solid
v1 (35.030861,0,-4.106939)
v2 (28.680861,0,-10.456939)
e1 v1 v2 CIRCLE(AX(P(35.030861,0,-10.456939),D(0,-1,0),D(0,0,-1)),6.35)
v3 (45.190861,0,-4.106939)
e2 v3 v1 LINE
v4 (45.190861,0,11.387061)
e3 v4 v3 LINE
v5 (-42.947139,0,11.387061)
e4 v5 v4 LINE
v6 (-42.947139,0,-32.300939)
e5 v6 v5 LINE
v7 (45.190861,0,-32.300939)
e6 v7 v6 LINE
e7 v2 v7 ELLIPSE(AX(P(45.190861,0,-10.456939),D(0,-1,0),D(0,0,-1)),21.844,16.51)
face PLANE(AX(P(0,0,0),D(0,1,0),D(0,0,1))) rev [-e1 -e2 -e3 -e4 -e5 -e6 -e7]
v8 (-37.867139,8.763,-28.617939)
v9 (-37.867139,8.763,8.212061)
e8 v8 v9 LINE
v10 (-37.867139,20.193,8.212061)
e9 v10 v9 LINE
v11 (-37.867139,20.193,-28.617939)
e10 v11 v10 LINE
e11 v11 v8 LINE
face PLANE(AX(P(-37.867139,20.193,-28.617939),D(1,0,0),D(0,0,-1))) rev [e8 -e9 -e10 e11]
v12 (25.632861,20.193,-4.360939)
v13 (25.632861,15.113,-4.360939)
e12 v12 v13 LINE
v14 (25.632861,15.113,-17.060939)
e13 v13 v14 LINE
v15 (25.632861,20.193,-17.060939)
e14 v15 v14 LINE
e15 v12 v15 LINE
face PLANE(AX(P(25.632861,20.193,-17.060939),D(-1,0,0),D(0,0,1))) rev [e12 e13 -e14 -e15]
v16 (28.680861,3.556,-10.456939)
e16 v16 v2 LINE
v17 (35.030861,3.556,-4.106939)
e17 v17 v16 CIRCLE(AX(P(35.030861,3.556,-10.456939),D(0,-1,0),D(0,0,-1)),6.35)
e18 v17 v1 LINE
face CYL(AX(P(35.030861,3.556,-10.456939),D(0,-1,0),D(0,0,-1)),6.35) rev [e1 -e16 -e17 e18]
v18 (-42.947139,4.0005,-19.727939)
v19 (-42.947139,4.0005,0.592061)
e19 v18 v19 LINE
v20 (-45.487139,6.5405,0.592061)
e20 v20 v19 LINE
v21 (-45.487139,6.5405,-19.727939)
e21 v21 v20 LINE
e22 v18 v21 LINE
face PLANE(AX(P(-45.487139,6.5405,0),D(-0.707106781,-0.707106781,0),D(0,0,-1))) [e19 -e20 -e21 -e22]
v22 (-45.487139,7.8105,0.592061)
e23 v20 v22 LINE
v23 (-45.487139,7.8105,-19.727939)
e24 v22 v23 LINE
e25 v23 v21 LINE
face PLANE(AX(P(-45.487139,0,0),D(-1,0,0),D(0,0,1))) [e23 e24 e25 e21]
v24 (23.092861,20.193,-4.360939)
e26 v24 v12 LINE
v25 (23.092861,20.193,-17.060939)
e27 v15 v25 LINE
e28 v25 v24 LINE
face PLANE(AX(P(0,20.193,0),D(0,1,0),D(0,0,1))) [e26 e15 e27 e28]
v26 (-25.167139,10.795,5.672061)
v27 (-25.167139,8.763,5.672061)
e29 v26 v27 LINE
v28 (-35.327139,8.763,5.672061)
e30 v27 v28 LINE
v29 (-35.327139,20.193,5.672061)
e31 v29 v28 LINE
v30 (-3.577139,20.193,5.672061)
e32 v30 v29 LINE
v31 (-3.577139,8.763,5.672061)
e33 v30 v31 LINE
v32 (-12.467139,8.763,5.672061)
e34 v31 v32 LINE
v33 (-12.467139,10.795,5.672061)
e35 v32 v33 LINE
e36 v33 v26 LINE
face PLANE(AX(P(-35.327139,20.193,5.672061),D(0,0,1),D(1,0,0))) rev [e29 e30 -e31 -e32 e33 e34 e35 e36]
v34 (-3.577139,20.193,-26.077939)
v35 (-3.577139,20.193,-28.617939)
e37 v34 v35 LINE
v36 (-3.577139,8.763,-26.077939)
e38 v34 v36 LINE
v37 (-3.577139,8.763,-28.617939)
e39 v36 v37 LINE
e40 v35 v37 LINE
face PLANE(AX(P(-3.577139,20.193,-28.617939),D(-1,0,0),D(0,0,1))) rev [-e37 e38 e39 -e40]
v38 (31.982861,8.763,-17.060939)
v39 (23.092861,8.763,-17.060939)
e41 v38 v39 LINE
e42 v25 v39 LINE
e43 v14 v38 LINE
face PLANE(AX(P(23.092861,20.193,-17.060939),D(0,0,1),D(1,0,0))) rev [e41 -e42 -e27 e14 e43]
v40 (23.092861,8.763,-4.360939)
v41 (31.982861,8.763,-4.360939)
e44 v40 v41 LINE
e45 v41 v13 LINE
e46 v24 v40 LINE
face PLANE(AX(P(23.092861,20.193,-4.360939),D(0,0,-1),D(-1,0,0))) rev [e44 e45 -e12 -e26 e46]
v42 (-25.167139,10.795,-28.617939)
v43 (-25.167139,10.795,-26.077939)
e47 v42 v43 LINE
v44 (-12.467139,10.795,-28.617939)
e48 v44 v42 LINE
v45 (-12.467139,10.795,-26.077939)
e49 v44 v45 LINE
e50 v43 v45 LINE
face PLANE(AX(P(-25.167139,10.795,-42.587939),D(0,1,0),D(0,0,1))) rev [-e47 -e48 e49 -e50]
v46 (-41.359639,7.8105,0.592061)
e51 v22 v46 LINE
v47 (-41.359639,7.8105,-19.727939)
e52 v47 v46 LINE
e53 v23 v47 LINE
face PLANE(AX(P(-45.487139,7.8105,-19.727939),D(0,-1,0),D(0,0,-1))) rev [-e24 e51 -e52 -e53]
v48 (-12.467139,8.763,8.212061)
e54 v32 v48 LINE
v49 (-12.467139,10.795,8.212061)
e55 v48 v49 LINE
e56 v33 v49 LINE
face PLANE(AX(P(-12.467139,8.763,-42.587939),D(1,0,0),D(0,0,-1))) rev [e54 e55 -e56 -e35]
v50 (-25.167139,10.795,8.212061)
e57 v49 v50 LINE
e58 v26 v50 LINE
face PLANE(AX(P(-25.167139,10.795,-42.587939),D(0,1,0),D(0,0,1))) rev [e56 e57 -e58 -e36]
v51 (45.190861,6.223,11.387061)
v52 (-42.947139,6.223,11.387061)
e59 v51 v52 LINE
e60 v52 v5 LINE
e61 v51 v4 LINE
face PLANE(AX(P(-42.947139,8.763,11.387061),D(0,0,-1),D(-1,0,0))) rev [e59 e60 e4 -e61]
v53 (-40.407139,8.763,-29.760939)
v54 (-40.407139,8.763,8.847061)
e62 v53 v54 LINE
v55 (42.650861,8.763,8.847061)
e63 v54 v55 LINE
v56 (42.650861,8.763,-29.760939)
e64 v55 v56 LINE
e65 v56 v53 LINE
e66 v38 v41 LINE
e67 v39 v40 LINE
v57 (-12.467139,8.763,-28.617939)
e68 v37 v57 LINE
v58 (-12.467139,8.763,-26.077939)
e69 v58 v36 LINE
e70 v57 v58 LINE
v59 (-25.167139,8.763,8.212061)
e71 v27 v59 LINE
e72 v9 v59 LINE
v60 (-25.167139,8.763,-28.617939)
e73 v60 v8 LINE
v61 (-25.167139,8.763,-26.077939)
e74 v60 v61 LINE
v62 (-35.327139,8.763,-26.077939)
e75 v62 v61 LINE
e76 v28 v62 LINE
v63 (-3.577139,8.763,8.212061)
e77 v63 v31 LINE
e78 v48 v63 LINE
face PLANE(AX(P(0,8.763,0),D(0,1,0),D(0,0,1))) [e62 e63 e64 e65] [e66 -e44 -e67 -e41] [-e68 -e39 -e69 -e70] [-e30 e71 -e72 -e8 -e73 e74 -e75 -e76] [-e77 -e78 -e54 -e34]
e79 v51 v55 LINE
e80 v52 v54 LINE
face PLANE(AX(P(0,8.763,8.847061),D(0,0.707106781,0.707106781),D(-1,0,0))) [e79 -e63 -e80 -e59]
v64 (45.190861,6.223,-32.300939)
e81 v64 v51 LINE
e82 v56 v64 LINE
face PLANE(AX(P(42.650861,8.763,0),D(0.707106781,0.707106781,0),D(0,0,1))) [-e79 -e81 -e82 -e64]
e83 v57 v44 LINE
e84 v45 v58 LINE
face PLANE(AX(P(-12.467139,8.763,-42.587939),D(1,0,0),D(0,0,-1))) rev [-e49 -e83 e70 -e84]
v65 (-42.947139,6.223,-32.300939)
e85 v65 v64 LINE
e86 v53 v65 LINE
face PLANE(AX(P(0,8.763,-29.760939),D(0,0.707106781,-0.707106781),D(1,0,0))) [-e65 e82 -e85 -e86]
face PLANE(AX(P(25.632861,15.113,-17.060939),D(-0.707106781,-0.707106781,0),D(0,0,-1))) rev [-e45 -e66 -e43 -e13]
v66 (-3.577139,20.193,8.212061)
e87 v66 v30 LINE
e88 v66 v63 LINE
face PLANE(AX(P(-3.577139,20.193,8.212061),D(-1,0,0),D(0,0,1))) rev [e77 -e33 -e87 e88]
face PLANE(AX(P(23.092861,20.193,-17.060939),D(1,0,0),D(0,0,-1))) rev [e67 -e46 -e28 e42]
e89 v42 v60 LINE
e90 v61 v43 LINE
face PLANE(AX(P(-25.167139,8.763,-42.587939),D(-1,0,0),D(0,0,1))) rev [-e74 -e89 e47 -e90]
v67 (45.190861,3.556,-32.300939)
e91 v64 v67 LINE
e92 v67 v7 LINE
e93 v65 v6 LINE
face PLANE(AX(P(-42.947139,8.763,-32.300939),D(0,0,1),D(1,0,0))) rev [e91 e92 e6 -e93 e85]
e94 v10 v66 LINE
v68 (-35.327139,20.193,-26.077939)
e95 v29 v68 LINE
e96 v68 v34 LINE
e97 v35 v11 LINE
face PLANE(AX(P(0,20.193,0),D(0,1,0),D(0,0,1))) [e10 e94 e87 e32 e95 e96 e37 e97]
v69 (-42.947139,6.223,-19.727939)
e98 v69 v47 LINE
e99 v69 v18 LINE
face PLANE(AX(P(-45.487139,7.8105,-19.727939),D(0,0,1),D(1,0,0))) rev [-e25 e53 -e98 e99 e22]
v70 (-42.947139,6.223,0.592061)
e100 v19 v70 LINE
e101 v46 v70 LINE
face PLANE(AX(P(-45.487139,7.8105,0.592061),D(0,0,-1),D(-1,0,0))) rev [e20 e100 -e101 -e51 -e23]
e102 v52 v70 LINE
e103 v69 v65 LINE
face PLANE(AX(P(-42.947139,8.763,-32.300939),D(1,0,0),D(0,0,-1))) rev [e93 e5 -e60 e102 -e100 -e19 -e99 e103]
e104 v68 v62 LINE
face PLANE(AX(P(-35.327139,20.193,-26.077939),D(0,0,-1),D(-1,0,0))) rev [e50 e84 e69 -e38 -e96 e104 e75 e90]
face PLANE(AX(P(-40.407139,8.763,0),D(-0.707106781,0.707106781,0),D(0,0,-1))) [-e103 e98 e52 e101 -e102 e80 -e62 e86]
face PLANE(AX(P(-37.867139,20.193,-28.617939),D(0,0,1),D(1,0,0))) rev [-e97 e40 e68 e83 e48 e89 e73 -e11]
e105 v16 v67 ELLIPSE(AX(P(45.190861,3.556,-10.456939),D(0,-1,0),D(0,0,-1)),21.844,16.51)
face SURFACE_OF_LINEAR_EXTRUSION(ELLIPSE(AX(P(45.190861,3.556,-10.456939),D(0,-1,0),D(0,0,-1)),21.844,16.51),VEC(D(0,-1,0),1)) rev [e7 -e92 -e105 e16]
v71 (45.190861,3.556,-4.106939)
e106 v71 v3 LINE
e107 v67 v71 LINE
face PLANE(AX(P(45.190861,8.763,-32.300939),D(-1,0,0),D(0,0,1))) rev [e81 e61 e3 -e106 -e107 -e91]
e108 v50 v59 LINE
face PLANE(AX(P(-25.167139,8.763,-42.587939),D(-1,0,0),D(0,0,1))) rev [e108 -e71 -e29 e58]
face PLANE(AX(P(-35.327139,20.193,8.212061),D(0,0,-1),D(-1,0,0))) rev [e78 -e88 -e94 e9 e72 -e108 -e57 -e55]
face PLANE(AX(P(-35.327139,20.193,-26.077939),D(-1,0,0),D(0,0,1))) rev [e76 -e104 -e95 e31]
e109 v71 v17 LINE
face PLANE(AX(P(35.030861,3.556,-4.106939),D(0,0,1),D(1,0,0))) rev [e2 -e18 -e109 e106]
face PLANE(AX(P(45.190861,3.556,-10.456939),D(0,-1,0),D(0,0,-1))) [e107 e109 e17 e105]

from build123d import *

# Parameters (mm, degrees)
SKETCH1_W           = 88.138
SKETCH1_H           = 43.688
BOSS_EXTRUDE1_DEPTH = 8.763
CHAMFER1_SIZE       = 2.54
SKETCH2_W           = 2.54
SKETCH2_H           = 12.7
BOSS_EXTRUDE2_DEPTH = 11.43
SKETCH3_W           = 20.32
SKETCH3_H           = 3.81
BOSS_EXTRUDE3_DEPTH = 7.62
CHAMFER2_SIZE       = 2.54
SKETCH4_W           = 12.7
SKETCH4_H           = 2.032
CUT_EXTRUDE1_DEPTH  = 50.8
CUT_EXTRUDE2_DEPTH  = 3.556
CHAMFER3_SIZE       = 6.35


with BuildPart() as part:
    # Sketch1 → Boss-Extrude1 (new body)
    with BuildSketch(Plane(origin=(0, 0, 0), x_dir=(1, 0, 0), z_dir=(0, 1, 0))):
        with Locations((1.121860858, 10.456938882)):
            Rectangle(SKETCH1_W, SKETCH1_H)
    extrude(amount=BOSS_EXTRUDE1_DEPTH)

    # Chamfer1
    chamfer1_edges = [part.edges().sort_by_distance(p)[0] for p in [
        (45.190860858, 8.763, -10.456938882),
        (1.121860858, 8.763, -32.300938882),
        (-42.947139142, 8.763, -10.456938882),
        (1.121860858, 8.763, 11.387061118),
    ]]
    chamfer(chamfer1_edges, length=CHAMFER1_SIZE)

    # Sketch2 → Boss-Extrude2 (add)
    with BuildSketch(Plane(origin=(0, 8.763, 0), x_dir=(1, 0, 0), z_dir=(0, 1, 0))):
        Polygon((-37.867139142, 28.617938882), (-35.327139142, 28.617938882), (-3.577139142, 28.617938882), (-3.577139142, 26.077938882), (-35.327139142, 26.077938882), (-35.327139142, -5.672061118), (-3.577139142, -5.672061118), (-3.577139142, -8.212061118), (-35.327139142, -8.212061118), (-37.867139142, -8.212061118), align=None)
        with Locations((24.362860858, 10.710938882)):
            Rectangle(SKETCH2_W, SKETCH2_H)
    extrude(amount=BOSS_EXTRUDE2_DEPTH)

    # Sketch3 → Boss-Extrude3 (add)
    with BuildSketch(Plane.ZY.offset(37.867139142)):
        with Locations((-9.567938882, 5.9055)):
            Rectangle(SKETCH3_W, SKETCH3_H)
    extrude(amount=BOSS_EXTRUDE3_DEPTH)

    # Chamfer2
    chamfer2_edges = [part.edges().sort_by_distance(p)[0] for p in [
        (-45.487139142, 4.0005, -9.567938882),
    ]]
    chamfer(chamfer2_edges, length=CHAMFER2_SIZE - 0.0001)  # a hair under: the kernel refuses the full size

    # Sketch4 → Cut-Extrude1 (cut)
    with BuildSketch(Plane.XY.offset(8.212061118)):
        with Locations((-18.817139142, 9.779)):
            Rectangle(SKETCH4_W, SKETCH4_H)
    extrude(amount=-CUT_EXTRUDE1_DEPTH, mode=Mode.SUBTRACT)

    # Sketch5 → Cut-Extrude2 (cut)
    with BuildSketch(Plane.XZ):
        with BuildLine():
            Line((35.030860858, -4.106938882), (45.190860858, -4.106938882))
            Line((45.190860858, -4.106938882), (45.190860858, -16.806938882))
            Line((45.190860858, -16.806938882), (45.190860858, -32.300938882))
            add(Edge.make_bspline(
                [(28.680860858, -10.456938882), (28.680860858, -32.300938882), (45.190860858, -32.300938882)],
                knots=[4.71238898, 4.71238898, 4.71238898, 6.283185307, 6.283185307, 6.283185307], degree=2, weights=[1, 0.707106781, 1]))
            ThreePointArc((28.680860858, -10.456938882), (30.540732798, -5.966810821), (35.030860858, -4.106938882))
        make_face()
    extrude(amount=-CUT_EXTRUDE2_DEPTH, mode=Mode.SUBTRACT)

    # Chamfer3
    chamfer3_edges = [part.edges().sort_by_distance(p)[0] for p in [
        (25.632860858, 8.763, -10.710938882),
    ]]
    chamfer(chamfer3_edges, length=CHAMFER3_SIZE)


solid = part.part
